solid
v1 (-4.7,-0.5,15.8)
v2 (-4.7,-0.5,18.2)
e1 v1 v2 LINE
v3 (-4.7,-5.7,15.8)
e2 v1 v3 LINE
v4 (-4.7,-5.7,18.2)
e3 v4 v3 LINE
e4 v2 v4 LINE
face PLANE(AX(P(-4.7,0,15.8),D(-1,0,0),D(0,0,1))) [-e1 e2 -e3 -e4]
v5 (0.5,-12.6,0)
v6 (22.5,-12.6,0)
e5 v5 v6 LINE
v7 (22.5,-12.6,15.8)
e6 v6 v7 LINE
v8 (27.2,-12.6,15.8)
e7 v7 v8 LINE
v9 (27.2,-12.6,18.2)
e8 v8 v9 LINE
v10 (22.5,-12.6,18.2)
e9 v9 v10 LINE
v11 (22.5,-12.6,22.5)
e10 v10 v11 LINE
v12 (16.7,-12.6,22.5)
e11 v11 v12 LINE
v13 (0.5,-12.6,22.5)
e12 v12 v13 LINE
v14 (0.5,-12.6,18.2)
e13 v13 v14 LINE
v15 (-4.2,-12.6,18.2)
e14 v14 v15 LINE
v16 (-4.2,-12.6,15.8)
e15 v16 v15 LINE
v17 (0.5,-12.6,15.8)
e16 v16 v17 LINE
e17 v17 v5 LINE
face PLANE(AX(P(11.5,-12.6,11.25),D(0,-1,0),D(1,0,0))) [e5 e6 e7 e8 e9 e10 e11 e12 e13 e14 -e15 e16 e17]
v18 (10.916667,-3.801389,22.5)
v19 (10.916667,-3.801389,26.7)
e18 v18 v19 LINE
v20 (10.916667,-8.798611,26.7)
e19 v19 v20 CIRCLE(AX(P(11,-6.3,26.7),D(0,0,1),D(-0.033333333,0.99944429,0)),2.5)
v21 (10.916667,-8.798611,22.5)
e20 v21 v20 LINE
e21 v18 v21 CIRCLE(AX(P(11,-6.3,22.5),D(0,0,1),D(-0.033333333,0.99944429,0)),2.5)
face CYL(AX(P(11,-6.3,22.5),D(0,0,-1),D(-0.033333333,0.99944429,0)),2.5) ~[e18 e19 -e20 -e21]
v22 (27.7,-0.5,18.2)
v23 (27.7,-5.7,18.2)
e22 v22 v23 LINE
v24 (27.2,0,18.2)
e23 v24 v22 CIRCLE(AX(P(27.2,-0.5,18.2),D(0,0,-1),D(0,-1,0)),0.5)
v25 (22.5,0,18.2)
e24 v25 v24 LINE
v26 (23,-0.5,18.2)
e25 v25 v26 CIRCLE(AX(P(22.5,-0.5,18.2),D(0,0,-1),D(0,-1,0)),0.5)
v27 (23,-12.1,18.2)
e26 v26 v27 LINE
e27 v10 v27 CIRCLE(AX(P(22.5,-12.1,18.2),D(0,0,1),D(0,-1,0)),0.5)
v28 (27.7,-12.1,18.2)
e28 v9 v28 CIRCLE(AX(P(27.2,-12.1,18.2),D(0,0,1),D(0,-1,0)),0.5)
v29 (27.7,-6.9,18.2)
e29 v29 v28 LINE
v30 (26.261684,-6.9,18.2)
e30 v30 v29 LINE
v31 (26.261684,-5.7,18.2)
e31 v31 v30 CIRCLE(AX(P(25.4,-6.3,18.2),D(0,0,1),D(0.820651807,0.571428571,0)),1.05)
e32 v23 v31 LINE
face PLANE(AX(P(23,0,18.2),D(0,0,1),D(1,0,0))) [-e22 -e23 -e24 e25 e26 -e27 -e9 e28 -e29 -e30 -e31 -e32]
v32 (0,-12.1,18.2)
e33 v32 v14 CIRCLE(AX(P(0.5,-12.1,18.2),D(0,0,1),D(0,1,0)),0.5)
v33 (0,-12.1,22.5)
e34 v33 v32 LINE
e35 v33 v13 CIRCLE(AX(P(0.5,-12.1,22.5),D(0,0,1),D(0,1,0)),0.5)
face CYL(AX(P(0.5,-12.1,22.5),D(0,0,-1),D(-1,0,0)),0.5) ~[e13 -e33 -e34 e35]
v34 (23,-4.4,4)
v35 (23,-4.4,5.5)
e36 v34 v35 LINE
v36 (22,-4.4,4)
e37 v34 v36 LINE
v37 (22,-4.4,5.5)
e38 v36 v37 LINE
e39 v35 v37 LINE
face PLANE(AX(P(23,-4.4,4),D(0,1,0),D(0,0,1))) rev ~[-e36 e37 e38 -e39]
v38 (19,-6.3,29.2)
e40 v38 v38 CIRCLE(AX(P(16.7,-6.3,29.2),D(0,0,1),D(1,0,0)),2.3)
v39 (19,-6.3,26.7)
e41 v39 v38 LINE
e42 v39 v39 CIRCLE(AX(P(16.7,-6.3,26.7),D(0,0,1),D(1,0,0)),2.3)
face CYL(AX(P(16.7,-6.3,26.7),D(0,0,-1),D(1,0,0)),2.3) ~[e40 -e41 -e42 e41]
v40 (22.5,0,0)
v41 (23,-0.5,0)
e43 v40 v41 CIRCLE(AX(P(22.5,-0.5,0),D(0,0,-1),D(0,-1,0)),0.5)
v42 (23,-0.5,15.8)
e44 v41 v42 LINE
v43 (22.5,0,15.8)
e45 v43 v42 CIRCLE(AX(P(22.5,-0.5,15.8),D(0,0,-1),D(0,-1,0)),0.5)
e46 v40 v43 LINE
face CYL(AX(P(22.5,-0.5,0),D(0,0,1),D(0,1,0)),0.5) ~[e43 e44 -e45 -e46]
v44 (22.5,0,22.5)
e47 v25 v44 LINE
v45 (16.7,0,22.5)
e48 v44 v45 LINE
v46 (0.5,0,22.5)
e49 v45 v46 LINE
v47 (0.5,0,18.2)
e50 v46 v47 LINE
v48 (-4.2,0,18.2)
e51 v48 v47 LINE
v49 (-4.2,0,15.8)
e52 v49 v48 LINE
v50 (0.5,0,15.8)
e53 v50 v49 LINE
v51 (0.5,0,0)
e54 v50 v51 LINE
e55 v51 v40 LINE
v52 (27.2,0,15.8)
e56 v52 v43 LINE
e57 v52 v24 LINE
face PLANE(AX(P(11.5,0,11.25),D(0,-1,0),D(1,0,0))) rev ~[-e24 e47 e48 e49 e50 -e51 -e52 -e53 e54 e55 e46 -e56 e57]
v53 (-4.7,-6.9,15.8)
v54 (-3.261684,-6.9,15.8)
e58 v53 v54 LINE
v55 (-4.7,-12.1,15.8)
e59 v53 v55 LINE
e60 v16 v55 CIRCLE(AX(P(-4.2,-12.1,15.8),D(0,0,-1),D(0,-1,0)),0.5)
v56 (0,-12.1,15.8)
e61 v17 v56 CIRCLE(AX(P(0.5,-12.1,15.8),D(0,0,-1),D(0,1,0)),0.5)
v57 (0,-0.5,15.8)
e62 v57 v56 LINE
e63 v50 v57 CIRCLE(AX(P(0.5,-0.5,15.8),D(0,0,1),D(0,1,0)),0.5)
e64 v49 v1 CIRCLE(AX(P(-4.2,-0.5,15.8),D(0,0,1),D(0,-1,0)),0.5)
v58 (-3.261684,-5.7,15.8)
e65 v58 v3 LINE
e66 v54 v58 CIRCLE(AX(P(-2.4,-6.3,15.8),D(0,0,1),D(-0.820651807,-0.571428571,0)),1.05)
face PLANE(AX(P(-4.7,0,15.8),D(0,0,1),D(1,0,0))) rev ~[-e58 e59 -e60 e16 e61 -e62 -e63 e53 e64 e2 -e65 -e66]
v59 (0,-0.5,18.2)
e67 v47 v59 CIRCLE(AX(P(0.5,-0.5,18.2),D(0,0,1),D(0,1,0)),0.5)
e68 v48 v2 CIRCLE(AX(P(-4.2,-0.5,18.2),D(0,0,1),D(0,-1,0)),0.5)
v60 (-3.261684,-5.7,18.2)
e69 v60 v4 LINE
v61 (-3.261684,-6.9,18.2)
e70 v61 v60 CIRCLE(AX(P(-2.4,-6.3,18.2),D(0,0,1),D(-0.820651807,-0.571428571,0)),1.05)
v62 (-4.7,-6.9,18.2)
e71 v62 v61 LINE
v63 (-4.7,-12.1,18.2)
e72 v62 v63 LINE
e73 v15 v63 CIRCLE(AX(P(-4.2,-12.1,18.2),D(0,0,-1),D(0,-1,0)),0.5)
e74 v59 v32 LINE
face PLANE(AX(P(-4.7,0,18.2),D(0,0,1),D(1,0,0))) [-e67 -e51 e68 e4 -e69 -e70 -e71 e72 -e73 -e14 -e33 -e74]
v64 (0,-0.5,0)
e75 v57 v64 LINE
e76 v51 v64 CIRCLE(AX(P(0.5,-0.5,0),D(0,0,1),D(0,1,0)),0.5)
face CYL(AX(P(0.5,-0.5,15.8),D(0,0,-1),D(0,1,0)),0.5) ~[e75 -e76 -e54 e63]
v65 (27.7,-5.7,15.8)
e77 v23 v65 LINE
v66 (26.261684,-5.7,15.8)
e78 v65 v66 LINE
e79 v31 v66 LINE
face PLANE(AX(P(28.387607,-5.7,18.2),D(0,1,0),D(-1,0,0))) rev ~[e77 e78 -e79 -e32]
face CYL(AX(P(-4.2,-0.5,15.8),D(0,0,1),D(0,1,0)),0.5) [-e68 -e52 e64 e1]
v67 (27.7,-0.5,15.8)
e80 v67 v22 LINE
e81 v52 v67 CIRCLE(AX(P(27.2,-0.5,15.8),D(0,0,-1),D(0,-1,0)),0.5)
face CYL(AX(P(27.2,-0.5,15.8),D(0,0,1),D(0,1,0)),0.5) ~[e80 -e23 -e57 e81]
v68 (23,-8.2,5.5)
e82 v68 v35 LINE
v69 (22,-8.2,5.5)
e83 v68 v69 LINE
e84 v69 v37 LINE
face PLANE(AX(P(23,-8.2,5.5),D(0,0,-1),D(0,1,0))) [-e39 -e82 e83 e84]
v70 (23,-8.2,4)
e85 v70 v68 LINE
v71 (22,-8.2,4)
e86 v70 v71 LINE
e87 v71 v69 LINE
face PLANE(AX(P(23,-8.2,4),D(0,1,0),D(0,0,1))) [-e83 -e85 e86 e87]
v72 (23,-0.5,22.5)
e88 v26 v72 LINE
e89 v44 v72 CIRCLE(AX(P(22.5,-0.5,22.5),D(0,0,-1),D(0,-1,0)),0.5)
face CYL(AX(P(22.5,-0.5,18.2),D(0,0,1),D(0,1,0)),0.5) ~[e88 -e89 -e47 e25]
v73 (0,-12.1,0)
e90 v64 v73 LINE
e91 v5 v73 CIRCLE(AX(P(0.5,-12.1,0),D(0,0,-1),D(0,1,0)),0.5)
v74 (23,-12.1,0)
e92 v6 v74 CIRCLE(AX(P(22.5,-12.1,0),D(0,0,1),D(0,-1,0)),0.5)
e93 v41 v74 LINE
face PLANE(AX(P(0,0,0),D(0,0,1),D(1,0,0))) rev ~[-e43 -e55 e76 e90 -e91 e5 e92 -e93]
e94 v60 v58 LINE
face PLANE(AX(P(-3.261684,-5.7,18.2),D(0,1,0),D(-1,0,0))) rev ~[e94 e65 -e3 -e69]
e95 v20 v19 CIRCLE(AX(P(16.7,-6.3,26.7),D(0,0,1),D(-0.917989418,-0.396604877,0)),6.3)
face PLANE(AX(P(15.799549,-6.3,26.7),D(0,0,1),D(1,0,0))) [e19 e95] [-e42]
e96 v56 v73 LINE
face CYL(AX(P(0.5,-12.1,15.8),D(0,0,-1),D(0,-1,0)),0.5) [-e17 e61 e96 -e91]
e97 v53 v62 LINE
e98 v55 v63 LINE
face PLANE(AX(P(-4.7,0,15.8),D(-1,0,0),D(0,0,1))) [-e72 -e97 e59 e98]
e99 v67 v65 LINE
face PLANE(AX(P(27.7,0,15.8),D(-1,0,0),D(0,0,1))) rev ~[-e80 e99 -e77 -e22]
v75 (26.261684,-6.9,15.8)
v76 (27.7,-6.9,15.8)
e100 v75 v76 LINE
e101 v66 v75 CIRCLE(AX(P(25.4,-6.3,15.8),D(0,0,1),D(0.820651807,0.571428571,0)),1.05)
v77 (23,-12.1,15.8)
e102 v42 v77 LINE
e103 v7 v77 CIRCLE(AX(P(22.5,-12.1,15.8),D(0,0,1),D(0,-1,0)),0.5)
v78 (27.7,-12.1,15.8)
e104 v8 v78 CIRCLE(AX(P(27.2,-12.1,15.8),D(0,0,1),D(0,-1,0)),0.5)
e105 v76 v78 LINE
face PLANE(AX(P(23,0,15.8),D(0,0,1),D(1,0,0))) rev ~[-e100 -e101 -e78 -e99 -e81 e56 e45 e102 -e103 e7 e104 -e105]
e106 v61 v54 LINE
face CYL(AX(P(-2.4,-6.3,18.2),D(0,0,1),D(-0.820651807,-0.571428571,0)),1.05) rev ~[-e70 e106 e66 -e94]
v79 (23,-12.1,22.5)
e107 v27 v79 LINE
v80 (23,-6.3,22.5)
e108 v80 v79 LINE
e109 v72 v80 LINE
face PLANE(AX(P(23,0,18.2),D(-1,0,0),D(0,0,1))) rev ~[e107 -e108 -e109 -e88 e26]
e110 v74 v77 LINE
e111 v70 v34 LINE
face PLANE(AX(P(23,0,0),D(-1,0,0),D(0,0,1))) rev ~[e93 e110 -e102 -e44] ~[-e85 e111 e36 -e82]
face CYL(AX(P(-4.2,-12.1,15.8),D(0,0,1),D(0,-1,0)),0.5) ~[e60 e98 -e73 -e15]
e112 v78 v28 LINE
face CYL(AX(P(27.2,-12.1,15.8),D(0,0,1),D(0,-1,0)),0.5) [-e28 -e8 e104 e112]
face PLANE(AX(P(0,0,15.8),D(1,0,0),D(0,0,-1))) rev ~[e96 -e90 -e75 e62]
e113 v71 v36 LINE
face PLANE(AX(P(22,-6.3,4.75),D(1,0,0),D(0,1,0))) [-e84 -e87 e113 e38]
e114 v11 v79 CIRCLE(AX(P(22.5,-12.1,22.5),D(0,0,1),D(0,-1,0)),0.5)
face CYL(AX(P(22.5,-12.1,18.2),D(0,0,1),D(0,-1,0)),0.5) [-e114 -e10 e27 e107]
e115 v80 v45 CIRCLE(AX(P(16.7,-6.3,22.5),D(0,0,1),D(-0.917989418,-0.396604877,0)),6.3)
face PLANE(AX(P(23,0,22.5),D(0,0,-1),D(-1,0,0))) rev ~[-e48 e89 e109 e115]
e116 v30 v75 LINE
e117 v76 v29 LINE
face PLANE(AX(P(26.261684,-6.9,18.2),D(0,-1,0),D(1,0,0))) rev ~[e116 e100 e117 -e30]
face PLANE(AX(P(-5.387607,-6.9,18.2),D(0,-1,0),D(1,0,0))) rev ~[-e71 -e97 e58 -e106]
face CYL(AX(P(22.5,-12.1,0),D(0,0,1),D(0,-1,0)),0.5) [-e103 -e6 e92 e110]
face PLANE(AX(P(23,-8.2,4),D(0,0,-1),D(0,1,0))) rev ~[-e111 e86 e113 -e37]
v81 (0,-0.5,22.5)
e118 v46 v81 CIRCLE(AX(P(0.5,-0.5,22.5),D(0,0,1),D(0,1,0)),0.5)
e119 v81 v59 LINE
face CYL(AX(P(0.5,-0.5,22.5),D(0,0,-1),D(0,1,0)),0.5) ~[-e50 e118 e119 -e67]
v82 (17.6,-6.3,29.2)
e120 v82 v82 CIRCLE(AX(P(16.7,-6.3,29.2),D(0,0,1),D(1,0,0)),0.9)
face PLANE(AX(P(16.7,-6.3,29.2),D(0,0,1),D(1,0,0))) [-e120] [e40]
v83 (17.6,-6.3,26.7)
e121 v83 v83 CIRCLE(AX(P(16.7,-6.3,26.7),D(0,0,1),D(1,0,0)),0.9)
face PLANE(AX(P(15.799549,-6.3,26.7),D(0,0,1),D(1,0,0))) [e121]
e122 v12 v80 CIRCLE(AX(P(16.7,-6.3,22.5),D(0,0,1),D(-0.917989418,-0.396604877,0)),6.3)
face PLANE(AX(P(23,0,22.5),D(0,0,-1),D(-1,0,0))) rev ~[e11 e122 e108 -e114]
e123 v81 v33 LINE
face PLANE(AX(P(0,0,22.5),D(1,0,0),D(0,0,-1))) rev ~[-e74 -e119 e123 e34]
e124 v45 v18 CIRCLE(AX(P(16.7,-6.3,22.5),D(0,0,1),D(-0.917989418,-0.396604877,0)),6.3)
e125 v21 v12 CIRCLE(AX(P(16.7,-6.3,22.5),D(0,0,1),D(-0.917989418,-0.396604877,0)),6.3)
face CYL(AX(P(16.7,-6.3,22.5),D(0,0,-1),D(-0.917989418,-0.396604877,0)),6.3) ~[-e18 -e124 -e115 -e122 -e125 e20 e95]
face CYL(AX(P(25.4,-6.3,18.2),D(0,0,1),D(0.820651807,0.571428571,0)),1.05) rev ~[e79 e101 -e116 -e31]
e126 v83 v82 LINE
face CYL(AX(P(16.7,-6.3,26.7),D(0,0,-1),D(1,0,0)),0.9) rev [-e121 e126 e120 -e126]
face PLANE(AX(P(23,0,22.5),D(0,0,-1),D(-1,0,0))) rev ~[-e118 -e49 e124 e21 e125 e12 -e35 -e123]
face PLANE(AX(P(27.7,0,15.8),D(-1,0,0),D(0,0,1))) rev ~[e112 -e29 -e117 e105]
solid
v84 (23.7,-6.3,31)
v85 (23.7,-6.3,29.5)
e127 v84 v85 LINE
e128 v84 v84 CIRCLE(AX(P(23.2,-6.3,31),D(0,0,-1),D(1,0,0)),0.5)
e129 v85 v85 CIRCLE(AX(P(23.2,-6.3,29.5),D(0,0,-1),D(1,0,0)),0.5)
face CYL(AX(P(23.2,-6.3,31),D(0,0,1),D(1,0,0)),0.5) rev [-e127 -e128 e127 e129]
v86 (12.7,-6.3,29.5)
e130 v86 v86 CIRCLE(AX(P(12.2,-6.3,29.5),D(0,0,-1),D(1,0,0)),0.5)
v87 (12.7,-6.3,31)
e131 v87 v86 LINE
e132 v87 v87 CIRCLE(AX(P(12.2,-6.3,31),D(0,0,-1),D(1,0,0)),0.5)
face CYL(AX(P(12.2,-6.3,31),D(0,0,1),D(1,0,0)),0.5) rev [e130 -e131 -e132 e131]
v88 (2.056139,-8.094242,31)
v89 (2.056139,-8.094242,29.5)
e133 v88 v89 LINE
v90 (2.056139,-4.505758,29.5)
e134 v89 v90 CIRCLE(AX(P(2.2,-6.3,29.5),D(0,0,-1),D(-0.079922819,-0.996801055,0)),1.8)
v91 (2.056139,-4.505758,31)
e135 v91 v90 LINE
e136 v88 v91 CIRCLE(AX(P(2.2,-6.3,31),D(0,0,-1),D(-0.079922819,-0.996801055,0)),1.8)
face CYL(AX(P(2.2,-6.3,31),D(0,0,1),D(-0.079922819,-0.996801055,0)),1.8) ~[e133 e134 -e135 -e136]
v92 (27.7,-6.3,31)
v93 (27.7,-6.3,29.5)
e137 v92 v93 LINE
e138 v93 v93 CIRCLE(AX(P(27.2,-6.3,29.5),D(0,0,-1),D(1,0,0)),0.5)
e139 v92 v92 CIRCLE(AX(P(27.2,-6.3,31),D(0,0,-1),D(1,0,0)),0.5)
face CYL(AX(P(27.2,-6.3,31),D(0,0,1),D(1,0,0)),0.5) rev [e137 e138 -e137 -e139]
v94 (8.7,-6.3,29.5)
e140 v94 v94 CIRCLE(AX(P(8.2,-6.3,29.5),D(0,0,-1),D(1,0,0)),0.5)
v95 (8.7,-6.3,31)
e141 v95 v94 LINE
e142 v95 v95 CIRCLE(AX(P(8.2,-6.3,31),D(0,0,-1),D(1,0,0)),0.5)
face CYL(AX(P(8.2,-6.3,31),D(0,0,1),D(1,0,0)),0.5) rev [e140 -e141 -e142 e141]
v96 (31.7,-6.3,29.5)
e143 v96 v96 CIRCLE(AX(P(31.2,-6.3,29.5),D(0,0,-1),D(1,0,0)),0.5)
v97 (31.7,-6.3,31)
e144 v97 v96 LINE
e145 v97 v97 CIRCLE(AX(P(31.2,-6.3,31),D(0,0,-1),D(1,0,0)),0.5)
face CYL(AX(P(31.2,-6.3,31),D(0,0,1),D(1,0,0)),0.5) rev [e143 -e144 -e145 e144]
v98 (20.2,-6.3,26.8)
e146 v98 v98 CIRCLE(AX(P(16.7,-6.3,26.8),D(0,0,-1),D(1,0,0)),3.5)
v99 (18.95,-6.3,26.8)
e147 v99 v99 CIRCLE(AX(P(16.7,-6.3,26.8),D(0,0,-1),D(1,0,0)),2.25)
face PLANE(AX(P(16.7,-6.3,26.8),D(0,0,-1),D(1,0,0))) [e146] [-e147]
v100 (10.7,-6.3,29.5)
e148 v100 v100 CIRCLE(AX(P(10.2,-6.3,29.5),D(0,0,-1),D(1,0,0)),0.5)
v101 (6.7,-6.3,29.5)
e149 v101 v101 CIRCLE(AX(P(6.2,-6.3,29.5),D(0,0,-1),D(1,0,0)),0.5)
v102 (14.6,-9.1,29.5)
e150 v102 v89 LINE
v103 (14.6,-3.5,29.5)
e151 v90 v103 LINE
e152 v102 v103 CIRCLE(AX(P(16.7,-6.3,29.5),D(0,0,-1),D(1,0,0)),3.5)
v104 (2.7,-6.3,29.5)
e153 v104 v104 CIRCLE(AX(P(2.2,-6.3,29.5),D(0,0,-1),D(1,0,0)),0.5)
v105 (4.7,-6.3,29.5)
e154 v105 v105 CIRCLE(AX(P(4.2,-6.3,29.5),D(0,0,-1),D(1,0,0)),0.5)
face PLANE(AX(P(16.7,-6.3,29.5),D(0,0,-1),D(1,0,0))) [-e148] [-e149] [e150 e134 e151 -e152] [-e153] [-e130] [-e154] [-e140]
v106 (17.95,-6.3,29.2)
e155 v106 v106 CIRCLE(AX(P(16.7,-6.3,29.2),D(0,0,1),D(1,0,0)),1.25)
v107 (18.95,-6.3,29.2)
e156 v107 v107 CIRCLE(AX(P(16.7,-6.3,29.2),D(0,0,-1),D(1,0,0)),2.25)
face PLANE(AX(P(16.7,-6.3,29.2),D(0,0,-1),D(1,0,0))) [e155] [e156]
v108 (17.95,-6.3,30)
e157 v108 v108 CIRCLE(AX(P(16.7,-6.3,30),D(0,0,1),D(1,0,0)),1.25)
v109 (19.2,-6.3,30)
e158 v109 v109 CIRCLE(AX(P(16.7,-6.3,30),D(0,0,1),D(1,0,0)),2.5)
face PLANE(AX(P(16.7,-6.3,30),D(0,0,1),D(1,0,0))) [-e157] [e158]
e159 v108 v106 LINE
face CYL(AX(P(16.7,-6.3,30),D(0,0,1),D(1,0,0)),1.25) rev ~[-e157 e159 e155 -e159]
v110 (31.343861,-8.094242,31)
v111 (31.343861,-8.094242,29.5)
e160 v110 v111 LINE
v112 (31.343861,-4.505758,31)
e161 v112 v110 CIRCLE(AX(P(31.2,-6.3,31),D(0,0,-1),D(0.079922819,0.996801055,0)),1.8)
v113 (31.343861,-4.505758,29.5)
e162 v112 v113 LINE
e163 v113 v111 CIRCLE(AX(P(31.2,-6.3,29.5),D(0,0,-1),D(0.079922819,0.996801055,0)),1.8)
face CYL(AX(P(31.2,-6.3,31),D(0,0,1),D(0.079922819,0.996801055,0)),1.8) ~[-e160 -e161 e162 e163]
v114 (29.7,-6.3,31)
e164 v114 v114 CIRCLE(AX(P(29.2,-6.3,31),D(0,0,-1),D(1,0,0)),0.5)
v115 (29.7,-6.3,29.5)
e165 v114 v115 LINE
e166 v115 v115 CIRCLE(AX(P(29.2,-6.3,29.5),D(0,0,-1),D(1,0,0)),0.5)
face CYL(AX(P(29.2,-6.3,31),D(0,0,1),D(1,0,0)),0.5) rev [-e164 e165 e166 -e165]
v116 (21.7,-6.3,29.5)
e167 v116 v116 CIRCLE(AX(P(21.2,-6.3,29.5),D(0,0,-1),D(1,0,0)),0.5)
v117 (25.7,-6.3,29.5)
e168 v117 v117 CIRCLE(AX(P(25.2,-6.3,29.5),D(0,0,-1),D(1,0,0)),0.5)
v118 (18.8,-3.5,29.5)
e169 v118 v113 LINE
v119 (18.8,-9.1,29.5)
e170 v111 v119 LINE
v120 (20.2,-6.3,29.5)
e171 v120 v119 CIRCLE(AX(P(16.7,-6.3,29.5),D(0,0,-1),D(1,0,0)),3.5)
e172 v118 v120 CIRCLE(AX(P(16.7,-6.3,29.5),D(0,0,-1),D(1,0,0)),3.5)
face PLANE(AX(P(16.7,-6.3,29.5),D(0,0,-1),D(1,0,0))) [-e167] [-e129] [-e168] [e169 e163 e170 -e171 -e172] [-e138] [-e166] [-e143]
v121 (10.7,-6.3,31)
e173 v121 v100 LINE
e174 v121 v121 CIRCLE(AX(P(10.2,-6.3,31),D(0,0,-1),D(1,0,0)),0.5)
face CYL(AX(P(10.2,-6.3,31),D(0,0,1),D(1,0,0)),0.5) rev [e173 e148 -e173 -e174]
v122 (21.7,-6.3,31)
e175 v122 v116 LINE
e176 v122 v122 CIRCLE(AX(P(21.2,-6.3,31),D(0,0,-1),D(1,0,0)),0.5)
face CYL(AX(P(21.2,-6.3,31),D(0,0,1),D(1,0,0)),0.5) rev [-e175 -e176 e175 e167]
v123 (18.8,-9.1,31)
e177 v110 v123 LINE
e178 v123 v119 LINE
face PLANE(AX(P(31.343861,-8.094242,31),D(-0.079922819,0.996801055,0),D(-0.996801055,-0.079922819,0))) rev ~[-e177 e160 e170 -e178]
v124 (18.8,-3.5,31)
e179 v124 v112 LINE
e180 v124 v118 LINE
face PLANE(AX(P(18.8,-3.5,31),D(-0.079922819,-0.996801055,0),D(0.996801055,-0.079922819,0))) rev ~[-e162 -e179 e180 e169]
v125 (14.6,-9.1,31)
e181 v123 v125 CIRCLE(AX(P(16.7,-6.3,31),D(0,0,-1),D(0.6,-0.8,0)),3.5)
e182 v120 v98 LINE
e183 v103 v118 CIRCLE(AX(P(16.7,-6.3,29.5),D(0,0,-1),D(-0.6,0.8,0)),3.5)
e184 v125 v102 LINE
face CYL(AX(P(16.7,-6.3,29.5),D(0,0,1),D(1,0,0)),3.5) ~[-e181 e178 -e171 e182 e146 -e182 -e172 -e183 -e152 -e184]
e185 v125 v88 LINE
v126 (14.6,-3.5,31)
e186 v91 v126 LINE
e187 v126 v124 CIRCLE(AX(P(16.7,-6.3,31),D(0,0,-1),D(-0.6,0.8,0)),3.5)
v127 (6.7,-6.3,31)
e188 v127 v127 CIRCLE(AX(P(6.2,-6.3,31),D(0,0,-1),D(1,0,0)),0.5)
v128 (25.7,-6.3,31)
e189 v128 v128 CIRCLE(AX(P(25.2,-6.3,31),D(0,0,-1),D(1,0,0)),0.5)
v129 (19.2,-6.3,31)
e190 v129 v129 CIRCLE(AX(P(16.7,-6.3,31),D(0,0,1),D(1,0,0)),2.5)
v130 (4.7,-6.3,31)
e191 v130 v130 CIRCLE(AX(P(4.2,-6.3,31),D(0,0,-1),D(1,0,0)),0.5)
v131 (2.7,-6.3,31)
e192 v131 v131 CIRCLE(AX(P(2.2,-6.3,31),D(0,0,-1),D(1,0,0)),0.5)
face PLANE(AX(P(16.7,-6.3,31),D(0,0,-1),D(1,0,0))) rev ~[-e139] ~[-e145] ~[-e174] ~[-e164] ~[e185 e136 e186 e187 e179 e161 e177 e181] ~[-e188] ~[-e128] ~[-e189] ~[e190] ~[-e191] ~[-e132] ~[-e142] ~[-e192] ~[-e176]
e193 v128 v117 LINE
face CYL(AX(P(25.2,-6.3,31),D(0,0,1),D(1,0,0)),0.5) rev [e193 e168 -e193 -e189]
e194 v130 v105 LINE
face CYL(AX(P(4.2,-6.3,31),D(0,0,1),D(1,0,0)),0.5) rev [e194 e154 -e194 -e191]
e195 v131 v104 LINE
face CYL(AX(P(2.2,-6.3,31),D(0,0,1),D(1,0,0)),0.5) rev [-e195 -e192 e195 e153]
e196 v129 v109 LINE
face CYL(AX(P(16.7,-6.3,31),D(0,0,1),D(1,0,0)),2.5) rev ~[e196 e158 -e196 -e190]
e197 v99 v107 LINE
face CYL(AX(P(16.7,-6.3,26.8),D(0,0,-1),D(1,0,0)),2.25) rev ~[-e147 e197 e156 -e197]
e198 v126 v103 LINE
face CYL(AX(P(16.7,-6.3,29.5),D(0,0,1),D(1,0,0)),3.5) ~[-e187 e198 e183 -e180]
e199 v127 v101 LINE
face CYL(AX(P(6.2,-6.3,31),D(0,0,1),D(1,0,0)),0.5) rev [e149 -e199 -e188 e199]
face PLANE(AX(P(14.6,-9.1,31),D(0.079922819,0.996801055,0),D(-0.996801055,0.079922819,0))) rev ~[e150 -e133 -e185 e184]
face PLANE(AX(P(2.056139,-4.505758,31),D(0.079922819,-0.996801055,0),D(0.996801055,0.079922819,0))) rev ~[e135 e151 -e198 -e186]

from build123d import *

# Parameters (mm, degrees)
F0_W      = 4.7
F0_H      = 2.4
F1_DEPTH  = 12.6
F3_DEPTH  = 4.2
F4_R      = 2.3
F4_R_2    = 0.9
F5_DEPTH  = 2.5
F7_DEPTH  = 25
F8_R      = 0.5
F9_W      = 3.8
F9_H      = 1.5
F10_DEPTH = 1
F12_R     = 0.5
F13_DEPTH = 1.5
F14_R     = 3.5
F15_DEPTH = 2.7
F16_R     = 2.25
F17_DEPTH = 2.4
F18_R     = 2.5
F19_DEPTH = 1
F20_R     = 1.25
F21_DEPTH = 25


with BuildPart() as f1:
    # F0 (on Front) → F1 (new body)
    with BuildSketch(Plane.XZ):
        Polygon((0, 15.8), (0, 0), (23, 0), (23, 15.8), (23, 18.2), (23, 22.5), (0, 22.5), (0, 18.2), align=None)
        with Locations((-2.35, 17)):
            Rectangle(F0_W, F0_H)
        with Locations((25.35, 17)):
            Rectangle(F0_W, F0_H)
    extrude(amount=F1_DEPTH)

    # F2 (on face) → F3 (join)
    with BuildSketch(Plane.XY.offset(22.5)):
        with BuildLine():
            ThreePointArc((10.9166666667, -3.8013892749), (8.5, -6.3), (10.9166666667, -8.7986107251))
            ThreePointArc((10.9166666667, -8.7986107251), (23, -6.3), (10.9166666667, -3.8013892749))
        make_face()
    extrude(amount=F3_DEPTH)

    # F4 (on face) → F5 (join)
    with BuildSketch(Plane.XY.offset(26.7)):
        with Locations((16.7, -6.3)):
            Circle(F4_R)
        with Locations((16.7, -6.3)):
            Circle(F4_R_2, mode=Mode.SUBTRACT)
    extrude(amount=F5_DEPTH)

    # F6 (on face) → F7 (cut)
    with BuildSketch(Plane.XY.offset(18.2)):
        with BuildLine():
            Line((-5.3876070306, -6.9), (-3.261684397, -6.9))
            ThreePointArc((-3.261684397, -6.9), (-1.35, -6.3), (-3.261684397, -5.7))
            Line((-3.261684397, -5.7), (-5.3876070306, -5.7))
            Line((-5.3876070306, -5.7), (-5.3876070306, -6.9))
        make_face()
        with BuildLine():
            ThreePointArc((26.261684397, -5.7), (24.35, -6.3), (26.261684397, -6.9))
            Line((26.261684397, -6.9), (28.3876070306, -6.9))
            Line((28.3876070306, -6.9), (28.3876070306, -5.7))
            Line((28.3876070306, -5.7), (26.261684397, -5.7))
        make_face()
    extrude(amount=-F7_DEPTH, mode=Mode.SUBTRACT)

    # F8
    f8_edges = [f1.edges().sort_by_distance(p)[0] for p in [
        (0, -12.6, 20.35),
        (0, -12.6, 7.9),
        (0, 0, 20.35),
        (0, 0, 7.9),
        (-4.7, -12.6, 17),
        (-4.7, 0, 17),
        (27.7, -12.6, 17),
        (23, -12.6, 20.35),
        (23, -12.6, 7.9),
        (27.7, 0, 17),
        (23, 0, 20.35),
        (23, 0, 7.9),
    ]]
    fillet(f8_edges, radius=F8_R)

    # F9 (on face) → F10 (cut)
    with BuildSketch(Plane.YZ.offset(23)):
        with Locations((-6.3, 4.75)):
            Rectangle(F9_W, F9_H)
    extrude(amount=-F10_DEPTH, mode=Mode.SUBTRACT)


with BuildPart() as f13:
    # F12 (on offset) → F13 (new body)
    with BuildSketch(Plane(origin=(0, 0, 31), x_dir=(1, 0, 0), z_dir=(0, 0, -1))):
        with BuildLine():
            Line((2.0561389261, 4.5057581012), (14.6, 3.5))
            ThreePointArc((14.6, 3.5), (16.7, 2.8), (18.8, 3.5))
            Line((18.8, 3.5), (31.3438610739, 4.5057581012))
            ThreePointArc((31.3438610739, 4.5057581012), (33, 6.3), (31.3438610739, 8.0942418988))
            Line((31.3438610739, 8.0942418988), (18.8, 9.1))
            ThreePointArc((18.8, 9.1), (16.7, 9.8), (14.6, 9.1))
            Line((14.6, 9.1), (2.0561389261, 8.0942418988))
            ThreePointArc((2.0561389261, 8.0942418988), (0.4, 6.3), (2.0561389261, 4.5057581012))
        make_face()
        with Locations((2.2, 6.3)):
            Circle(F12_R, mode=Mode.SUBTRACT)
        with Locations((4.2, 6.3)):
            Circle(F12_R, mode=Mode.SUBTRACT)
        with Locations((6.2, 6.3)):
            Circle(F12_R, mode=Mode.SUBTRACT)
        with Locations((8.2, 6.3)):
            Circle(F12_R, mode=Mode.SUBTRACT)
        with Locations((10.2, 6.3)):
            Circle(F12_R, mode=Mode.SUBTRACT)
        with Locations((12.2, 6.3)):
            Circle(F12_R, mode=Mode.SUBTRACT)
        with Locations((21.2, 6.3)):
            Circle(F12_R, mode=Mode.SUBTRACT)
        with Locations((23.2, 6.3)):
            Circle(F12_R, mode=Mode.SUBTRACT)
        with Locations((25.2, 6.3)):
            Circle(F12_R, mode=Mode.SUBTRACT)
        with Locations((27.2, 6.3)):
            Circle(F12_R, mode=Mode.SUBTRACT)
        with Locations((29.2, 6.3)):
            Circle(F12_R, mode=Mode.SUBTRACT)
        with Locations((31.2, 6.3)):
            Circle(F12_R, mode=Mode.SUBTRACT)
    extrude(amount=F13_DEPTH)

    # F14 (on face) → F15 (join)
    with BuildSketch(Plane(origin=(0, 0, 29.5), x_dir=(1, 0, 0), z_dir=(0, 0, -1))):
        with Locations((16.7, 6.3)):
            Circle(F14_R)
    extrude(amount=F15_DEPTH)

    # F16 (on face) → F17 (cut)
    with BuildSketch(Plane(origin=(0, 0, 26.8), x_dir=(1, 0, 0), z_dir=(0, 0, -1))):
        with Locations((16.7, 6.3)):
            Circle(F16_R)
    extrude(amount=-F17_DEPTH, mode=Mode.SUBTRACT)

    # F18 (on face) → F19 (cut)
    with BuildSketch(Plane.XY.offset(31)):
        with Locations((16.7, -6.3)):
            Circle(F18_R)
    extrude(amount=-F19_DEPTH, mode=Mode.SUBTRACT)

    # F20 (on face) → F21 (cut)
    with BuildSketch(Plane.XY.offset(30)):
        with Locations((16.7, -6.3)):
            Circle(F20_R)
    extrude(amount=-F21_DEPTH, mode=Mode.SUBTRACT)


solid = Compound([f1.part, f13.part])
